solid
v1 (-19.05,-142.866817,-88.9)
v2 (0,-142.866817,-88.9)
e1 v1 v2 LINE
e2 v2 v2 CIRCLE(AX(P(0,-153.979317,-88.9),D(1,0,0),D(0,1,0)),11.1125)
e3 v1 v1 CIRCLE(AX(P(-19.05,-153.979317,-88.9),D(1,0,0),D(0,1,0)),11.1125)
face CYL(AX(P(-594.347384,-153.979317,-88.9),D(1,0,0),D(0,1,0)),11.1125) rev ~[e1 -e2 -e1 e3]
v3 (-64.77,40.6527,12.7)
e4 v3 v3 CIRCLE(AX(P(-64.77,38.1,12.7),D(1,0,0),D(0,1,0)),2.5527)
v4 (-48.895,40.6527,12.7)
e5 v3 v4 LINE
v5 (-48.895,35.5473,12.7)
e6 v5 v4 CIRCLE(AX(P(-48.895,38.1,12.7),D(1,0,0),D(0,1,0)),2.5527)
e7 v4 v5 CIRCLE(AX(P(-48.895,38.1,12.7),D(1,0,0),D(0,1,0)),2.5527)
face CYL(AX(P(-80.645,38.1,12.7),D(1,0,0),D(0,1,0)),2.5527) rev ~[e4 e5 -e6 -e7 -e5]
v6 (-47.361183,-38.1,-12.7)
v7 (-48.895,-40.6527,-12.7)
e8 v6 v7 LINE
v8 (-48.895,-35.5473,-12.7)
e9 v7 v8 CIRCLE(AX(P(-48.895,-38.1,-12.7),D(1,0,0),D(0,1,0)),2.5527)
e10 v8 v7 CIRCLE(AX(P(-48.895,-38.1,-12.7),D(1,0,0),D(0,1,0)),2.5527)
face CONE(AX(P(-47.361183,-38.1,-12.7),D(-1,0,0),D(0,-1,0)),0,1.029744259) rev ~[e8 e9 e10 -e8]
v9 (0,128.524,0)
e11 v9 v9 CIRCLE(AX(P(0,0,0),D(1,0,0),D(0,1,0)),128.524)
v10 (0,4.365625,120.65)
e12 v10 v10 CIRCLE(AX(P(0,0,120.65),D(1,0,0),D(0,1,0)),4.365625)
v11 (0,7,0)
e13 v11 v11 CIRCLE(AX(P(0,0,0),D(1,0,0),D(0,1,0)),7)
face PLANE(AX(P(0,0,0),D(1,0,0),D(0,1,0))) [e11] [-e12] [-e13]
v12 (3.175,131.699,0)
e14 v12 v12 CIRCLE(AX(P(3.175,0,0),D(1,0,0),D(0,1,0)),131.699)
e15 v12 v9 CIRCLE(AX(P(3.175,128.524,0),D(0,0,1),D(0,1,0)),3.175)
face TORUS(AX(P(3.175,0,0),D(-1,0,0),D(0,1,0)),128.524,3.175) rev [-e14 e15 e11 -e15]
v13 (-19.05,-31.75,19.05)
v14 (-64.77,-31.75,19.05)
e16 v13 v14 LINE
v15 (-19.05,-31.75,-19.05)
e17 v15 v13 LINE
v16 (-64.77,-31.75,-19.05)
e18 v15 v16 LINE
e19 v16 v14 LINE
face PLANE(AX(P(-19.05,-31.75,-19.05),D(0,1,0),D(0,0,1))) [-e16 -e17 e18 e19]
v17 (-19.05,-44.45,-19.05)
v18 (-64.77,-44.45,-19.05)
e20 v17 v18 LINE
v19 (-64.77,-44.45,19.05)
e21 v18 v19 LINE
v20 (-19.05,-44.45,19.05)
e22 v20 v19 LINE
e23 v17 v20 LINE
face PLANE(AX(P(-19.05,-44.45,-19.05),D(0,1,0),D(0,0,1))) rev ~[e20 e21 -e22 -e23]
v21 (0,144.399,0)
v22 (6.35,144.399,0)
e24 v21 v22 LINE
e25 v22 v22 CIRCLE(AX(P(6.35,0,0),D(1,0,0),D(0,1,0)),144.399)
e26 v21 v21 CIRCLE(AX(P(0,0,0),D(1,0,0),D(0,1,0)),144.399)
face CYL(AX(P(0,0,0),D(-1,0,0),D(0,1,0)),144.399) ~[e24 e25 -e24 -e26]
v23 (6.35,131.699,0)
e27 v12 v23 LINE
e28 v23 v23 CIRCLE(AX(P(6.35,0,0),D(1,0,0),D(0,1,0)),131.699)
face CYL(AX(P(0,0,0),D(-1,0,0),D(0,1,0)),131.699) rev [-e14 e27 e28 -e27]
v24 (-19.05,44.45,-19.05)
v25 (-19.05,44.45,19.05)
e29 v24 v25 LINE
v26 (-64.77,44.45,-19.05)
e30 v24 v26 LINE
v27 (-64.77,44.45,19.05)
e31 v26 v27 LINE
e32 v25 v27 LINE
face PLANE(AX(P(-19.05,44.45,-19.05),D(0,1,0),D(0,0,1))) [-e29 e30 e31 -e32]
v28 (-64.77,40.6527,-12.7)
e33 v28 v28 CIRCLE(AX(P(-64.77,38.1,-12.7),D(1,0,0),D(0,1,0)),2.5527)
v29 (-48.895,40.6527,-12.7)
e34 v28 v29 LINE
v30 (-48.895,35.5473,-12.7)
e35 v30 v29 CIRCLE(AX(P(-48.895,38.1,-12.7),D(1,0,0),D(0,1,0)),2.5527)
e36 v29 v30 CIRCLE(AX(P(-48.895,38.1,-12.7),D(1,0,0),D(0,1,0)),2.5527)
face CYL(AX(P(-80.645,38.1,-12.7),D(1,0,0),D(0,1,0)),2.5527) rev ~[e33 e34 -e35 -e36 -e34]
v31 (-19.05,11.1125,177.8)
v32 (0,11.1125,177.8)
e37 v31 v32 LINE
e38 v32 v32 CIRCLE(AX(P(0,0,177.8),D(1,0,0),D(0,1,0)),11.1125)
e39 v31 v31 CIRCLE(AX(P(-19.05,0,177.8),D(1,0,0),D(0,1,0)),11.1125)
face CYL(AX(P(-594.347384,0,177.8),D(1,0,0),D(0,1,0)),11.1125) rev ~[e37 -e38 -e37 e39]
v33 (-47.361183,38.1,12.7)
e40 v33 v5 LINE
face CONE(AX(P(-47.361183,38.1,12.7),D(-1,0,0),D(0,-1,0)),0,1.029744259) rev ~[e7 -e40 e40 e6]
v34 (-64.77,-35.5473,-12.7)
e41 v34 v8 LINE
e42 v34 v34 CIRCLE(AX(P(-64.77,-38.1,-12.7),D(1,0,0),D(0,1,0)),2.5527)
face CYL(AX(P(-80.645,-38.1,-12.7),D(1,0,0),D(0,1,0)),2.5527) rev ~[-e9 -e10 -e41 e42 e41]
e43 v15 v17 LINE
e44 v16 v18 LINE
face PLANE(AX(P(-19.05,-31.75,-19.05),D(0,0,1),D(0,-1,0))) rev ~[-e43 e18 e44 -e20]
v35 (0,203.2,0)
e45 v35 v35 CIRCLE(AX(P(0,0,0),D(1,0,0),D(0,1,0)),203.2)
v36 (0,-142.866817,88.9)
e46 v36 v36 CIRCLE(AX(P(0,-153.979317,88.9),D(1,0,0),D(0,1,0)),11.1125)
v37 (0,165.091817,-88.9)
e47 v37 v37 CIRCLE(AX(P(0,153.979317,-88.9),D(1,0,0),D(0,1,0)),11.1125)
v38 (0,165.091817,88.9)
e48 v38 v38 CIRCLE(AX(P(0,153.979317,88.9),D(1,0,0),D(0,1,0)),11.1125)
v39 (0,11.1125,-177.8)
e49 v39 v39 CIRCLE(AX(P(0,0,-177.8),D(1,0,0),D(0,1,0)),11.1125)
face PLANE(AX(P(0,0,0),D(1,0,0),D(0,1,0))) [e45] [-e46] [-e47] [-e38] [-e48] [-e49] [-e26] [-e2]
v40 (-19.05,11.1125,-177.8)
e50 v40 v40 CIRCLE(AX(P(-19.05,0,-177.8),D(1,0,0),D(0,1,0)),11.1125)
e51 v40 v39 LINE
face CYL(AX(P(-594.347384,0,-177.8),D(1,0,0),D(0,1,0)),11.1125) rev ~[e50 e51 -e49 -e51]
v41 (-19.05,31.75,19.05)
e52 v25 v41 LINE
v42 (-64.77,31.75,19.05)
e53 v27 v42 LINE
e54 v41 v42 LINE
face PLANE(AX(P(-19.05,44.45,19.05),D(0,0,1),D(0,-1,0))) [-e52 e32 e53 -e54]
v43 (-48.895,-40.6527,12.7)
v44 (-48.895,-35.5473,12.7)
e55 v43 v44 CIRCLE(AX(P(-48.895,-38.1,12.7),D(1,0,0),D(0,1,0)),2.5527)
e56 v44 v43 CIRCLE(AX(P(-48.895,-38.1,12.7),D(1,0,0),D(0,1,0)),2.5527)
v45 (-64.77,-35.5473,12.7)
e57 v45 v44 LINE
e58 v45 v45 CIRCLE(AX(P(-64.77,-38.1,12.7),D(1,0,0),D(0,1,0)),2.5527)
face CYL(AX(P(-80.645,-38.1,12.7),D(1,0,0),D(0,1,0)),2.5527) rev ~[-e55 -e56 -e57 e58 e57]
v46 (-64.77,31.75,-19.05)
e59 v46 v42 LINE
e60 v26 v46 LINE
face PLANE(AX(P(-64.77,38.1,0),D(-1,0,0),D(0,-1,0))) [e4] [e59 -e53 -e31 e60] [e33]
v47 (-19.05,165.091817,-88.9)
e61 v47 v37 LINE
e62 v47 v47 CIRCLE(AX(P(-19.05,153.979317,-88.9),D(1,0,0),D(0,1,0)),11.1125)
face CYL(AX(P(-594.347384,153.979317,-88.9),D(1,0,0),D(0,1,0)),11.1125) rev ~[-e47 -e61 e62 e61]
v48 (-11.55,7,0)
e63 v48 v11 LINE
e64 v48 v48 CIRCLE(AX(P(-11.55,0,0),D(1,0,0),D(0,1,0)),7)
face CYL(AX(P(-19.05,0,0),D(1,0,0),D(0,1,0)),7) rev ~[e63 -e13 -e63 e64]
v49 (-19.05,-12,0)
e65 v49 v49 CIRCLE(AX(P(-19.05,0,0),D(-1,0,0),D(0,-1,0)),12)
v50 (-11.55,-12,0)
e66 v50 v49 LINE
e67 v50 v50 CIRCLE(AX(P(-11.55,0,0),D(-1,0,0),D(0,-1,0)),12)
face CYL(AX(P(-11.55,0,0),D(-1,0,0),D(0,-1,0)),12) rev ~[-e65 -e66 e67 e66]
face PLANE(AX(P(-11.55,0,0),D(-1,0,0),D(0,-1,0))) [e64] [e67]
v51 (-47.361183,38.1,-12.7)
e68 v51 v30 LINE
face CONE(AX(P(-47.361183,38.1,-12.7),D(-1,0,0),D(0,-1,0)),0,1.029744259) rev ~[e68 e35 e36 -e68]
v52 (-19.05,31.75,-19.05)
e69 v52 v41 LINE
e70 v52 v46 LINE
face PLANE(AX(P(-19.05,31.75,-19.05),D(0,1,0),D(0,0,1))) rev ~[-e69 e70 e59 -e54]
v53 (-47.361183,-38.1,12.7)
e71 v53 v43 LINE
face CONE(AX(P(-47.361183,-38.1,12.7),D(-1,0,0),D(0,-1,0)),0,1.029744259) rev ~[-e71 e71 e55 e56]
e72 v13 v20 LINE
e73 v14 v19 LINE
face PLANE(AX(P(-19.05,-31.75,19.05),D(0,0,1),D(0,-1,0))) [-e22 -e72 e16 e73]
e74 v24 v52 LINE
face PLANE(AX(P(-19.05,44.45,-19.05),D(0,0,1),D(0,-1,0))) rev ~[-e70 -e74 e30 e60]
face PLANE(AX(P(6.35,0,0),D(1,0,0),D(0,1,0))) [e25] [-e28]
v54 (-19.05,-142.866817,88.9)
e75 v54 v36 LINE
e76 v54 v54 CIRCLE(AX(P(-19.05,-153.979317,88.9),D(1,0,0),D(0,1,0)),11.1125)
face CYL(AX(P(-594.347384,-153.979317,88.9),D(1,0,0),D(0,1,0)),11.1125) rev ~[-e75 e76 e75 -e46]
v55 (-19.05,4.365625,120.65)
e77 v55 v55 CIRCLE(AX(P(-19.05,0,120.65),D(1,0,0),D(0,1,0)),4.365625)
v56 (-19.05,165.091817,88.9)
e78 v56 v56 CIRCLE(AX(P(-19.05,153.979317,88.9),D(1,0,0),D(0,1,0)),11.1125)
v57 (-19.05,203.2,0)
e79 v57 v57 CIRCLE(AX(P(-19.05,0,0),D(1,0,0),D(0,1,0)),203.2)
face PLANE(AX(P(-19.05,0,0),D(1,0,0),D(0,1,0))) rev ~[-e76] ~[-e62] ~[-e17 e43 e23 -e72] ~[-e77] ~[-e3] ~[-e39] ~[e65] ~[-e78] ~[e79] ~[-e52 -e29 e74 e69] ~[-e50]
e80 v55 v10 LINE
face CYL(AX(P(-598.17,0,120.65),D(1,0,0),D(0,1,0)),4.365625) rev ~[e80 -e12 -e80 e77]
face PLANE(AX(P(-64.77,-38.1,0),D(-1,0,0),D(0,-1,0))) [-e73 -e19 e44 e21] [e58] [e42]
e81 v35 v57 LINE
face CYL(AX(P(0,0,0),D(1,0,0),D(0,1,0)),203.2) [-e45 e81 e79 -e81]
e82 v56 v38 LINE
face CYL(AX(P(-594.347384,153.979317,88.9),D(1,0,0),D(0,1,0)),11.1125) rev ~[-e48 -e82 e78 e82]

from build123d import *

# Parameters (mm, degrees)
F0_R           = 203.2
F1_DEPTH       = 19.05
F2_R           = 144.399
F2_R_2         = 131.699
F3_DEPTH       = 6.35
F4_R           = 3.175
F6_D           = 22.225
F8_D           = 14
F8_CBORE_D     = 24
F8_CBORE_DEPTH = 7.5
F9_W           = 12.7
F9_H           = 38.1
F10_DEPTH      = 45.72
F12_D          = 5.1054
F12_DEPTH      = 15.875
F12_TIP        = 1.5338169022
F14_D          = 8.73125


# Not quite as in the source:
# - a length typed as a fraction of an inch, garbled in the dataset ("3 / 203.2 mm" for 3/8 in), is restored


with BuildPart() as f1:
    # F0 (on Right) → F1 (new body)
    with BuildSketch(Plane.YZ):
        Circle(F0_R)
    extrude(amount=-F1_DEPTH)

    # F2 (on face) → F3 (join)
    with BuildSketch(Plane.YZ):
        Circle(F2_R)
        Circle(F2_R_2, mode=Mode.SUBTRACT)
    extrude(amount=F3_DEPTH)

    # F4
    f4_edges = [f1.edges().sort_by_distance(p)[0] for p in [
        (0, -131.699, 0),
    ]]
    fillet(f4_edges, radius=F4_R)

    # F6 (through all)
    with Locations(Plane(origin=(-19.05, 0, 0), x_dir=(0, -1, 0), z_dir=(-1, 0, 0))):
        with Locations((0, 177.8), (153.9793167929, 88.9), (-153.9793167929, 88.9), (-153.9793167929, -88.9), (153.9793167929, -88.9), (0, -177.8)):
            Hole(F6_D / 2)

    # F8 (through all)
    with Locations(Plane(origin=(-19.05, 0, 0), x_dir=(0, -1, 0), z_dir=(-1, 0, 0))):
        with Locations((0, 0)):
            CounterBoreHole(F8_D / 2, F8_CBORE_D / 2, F8_CBORE_DEPTH)

    # F9 (on face) → F10 (join)
    with BuildSketch(Plane(origin=(-19.05, 0, 0), x_dir=(0, -1, 0), z_dir=(-1, 0, 0))):
        with Locations((38.1, 0)):
            Rectangle(F9_W, F9_H)
        with Locations((-38.1, 0)):
            Rectangle(F9_W, F9_H)
    extrude(amount=F10_DEPTH)

    # F12
    with Locations(Plane(origin=(-64.77, 0, 0), x_dir=(0, -1, 0), z_dir=(-1, 0, 0))):
        with Locations((-38.1, 12.7), (-38.1, -12.7), (38.1, 12.7), (38.1, -12.7)):
            Hole(F12_D / 2, depth=F12_DEPTH)
            with Locations((0, 0, -(F12_DEPTH + F12_TIP / 2))):  # 118° drill point
                Cone(0, F12_D / 2, F12_TIP, mode=Mode.SUBTRACT)

    # F14 (through all)
    with Locations(Plane(origin=(-19.05, 0, 0), x_dir=(0, -1, 0), z_dir=(-1, 0, 0))):
        with Locations((0, 120.65)):
            Hole(F14_D / 2)


solid = f1.part
